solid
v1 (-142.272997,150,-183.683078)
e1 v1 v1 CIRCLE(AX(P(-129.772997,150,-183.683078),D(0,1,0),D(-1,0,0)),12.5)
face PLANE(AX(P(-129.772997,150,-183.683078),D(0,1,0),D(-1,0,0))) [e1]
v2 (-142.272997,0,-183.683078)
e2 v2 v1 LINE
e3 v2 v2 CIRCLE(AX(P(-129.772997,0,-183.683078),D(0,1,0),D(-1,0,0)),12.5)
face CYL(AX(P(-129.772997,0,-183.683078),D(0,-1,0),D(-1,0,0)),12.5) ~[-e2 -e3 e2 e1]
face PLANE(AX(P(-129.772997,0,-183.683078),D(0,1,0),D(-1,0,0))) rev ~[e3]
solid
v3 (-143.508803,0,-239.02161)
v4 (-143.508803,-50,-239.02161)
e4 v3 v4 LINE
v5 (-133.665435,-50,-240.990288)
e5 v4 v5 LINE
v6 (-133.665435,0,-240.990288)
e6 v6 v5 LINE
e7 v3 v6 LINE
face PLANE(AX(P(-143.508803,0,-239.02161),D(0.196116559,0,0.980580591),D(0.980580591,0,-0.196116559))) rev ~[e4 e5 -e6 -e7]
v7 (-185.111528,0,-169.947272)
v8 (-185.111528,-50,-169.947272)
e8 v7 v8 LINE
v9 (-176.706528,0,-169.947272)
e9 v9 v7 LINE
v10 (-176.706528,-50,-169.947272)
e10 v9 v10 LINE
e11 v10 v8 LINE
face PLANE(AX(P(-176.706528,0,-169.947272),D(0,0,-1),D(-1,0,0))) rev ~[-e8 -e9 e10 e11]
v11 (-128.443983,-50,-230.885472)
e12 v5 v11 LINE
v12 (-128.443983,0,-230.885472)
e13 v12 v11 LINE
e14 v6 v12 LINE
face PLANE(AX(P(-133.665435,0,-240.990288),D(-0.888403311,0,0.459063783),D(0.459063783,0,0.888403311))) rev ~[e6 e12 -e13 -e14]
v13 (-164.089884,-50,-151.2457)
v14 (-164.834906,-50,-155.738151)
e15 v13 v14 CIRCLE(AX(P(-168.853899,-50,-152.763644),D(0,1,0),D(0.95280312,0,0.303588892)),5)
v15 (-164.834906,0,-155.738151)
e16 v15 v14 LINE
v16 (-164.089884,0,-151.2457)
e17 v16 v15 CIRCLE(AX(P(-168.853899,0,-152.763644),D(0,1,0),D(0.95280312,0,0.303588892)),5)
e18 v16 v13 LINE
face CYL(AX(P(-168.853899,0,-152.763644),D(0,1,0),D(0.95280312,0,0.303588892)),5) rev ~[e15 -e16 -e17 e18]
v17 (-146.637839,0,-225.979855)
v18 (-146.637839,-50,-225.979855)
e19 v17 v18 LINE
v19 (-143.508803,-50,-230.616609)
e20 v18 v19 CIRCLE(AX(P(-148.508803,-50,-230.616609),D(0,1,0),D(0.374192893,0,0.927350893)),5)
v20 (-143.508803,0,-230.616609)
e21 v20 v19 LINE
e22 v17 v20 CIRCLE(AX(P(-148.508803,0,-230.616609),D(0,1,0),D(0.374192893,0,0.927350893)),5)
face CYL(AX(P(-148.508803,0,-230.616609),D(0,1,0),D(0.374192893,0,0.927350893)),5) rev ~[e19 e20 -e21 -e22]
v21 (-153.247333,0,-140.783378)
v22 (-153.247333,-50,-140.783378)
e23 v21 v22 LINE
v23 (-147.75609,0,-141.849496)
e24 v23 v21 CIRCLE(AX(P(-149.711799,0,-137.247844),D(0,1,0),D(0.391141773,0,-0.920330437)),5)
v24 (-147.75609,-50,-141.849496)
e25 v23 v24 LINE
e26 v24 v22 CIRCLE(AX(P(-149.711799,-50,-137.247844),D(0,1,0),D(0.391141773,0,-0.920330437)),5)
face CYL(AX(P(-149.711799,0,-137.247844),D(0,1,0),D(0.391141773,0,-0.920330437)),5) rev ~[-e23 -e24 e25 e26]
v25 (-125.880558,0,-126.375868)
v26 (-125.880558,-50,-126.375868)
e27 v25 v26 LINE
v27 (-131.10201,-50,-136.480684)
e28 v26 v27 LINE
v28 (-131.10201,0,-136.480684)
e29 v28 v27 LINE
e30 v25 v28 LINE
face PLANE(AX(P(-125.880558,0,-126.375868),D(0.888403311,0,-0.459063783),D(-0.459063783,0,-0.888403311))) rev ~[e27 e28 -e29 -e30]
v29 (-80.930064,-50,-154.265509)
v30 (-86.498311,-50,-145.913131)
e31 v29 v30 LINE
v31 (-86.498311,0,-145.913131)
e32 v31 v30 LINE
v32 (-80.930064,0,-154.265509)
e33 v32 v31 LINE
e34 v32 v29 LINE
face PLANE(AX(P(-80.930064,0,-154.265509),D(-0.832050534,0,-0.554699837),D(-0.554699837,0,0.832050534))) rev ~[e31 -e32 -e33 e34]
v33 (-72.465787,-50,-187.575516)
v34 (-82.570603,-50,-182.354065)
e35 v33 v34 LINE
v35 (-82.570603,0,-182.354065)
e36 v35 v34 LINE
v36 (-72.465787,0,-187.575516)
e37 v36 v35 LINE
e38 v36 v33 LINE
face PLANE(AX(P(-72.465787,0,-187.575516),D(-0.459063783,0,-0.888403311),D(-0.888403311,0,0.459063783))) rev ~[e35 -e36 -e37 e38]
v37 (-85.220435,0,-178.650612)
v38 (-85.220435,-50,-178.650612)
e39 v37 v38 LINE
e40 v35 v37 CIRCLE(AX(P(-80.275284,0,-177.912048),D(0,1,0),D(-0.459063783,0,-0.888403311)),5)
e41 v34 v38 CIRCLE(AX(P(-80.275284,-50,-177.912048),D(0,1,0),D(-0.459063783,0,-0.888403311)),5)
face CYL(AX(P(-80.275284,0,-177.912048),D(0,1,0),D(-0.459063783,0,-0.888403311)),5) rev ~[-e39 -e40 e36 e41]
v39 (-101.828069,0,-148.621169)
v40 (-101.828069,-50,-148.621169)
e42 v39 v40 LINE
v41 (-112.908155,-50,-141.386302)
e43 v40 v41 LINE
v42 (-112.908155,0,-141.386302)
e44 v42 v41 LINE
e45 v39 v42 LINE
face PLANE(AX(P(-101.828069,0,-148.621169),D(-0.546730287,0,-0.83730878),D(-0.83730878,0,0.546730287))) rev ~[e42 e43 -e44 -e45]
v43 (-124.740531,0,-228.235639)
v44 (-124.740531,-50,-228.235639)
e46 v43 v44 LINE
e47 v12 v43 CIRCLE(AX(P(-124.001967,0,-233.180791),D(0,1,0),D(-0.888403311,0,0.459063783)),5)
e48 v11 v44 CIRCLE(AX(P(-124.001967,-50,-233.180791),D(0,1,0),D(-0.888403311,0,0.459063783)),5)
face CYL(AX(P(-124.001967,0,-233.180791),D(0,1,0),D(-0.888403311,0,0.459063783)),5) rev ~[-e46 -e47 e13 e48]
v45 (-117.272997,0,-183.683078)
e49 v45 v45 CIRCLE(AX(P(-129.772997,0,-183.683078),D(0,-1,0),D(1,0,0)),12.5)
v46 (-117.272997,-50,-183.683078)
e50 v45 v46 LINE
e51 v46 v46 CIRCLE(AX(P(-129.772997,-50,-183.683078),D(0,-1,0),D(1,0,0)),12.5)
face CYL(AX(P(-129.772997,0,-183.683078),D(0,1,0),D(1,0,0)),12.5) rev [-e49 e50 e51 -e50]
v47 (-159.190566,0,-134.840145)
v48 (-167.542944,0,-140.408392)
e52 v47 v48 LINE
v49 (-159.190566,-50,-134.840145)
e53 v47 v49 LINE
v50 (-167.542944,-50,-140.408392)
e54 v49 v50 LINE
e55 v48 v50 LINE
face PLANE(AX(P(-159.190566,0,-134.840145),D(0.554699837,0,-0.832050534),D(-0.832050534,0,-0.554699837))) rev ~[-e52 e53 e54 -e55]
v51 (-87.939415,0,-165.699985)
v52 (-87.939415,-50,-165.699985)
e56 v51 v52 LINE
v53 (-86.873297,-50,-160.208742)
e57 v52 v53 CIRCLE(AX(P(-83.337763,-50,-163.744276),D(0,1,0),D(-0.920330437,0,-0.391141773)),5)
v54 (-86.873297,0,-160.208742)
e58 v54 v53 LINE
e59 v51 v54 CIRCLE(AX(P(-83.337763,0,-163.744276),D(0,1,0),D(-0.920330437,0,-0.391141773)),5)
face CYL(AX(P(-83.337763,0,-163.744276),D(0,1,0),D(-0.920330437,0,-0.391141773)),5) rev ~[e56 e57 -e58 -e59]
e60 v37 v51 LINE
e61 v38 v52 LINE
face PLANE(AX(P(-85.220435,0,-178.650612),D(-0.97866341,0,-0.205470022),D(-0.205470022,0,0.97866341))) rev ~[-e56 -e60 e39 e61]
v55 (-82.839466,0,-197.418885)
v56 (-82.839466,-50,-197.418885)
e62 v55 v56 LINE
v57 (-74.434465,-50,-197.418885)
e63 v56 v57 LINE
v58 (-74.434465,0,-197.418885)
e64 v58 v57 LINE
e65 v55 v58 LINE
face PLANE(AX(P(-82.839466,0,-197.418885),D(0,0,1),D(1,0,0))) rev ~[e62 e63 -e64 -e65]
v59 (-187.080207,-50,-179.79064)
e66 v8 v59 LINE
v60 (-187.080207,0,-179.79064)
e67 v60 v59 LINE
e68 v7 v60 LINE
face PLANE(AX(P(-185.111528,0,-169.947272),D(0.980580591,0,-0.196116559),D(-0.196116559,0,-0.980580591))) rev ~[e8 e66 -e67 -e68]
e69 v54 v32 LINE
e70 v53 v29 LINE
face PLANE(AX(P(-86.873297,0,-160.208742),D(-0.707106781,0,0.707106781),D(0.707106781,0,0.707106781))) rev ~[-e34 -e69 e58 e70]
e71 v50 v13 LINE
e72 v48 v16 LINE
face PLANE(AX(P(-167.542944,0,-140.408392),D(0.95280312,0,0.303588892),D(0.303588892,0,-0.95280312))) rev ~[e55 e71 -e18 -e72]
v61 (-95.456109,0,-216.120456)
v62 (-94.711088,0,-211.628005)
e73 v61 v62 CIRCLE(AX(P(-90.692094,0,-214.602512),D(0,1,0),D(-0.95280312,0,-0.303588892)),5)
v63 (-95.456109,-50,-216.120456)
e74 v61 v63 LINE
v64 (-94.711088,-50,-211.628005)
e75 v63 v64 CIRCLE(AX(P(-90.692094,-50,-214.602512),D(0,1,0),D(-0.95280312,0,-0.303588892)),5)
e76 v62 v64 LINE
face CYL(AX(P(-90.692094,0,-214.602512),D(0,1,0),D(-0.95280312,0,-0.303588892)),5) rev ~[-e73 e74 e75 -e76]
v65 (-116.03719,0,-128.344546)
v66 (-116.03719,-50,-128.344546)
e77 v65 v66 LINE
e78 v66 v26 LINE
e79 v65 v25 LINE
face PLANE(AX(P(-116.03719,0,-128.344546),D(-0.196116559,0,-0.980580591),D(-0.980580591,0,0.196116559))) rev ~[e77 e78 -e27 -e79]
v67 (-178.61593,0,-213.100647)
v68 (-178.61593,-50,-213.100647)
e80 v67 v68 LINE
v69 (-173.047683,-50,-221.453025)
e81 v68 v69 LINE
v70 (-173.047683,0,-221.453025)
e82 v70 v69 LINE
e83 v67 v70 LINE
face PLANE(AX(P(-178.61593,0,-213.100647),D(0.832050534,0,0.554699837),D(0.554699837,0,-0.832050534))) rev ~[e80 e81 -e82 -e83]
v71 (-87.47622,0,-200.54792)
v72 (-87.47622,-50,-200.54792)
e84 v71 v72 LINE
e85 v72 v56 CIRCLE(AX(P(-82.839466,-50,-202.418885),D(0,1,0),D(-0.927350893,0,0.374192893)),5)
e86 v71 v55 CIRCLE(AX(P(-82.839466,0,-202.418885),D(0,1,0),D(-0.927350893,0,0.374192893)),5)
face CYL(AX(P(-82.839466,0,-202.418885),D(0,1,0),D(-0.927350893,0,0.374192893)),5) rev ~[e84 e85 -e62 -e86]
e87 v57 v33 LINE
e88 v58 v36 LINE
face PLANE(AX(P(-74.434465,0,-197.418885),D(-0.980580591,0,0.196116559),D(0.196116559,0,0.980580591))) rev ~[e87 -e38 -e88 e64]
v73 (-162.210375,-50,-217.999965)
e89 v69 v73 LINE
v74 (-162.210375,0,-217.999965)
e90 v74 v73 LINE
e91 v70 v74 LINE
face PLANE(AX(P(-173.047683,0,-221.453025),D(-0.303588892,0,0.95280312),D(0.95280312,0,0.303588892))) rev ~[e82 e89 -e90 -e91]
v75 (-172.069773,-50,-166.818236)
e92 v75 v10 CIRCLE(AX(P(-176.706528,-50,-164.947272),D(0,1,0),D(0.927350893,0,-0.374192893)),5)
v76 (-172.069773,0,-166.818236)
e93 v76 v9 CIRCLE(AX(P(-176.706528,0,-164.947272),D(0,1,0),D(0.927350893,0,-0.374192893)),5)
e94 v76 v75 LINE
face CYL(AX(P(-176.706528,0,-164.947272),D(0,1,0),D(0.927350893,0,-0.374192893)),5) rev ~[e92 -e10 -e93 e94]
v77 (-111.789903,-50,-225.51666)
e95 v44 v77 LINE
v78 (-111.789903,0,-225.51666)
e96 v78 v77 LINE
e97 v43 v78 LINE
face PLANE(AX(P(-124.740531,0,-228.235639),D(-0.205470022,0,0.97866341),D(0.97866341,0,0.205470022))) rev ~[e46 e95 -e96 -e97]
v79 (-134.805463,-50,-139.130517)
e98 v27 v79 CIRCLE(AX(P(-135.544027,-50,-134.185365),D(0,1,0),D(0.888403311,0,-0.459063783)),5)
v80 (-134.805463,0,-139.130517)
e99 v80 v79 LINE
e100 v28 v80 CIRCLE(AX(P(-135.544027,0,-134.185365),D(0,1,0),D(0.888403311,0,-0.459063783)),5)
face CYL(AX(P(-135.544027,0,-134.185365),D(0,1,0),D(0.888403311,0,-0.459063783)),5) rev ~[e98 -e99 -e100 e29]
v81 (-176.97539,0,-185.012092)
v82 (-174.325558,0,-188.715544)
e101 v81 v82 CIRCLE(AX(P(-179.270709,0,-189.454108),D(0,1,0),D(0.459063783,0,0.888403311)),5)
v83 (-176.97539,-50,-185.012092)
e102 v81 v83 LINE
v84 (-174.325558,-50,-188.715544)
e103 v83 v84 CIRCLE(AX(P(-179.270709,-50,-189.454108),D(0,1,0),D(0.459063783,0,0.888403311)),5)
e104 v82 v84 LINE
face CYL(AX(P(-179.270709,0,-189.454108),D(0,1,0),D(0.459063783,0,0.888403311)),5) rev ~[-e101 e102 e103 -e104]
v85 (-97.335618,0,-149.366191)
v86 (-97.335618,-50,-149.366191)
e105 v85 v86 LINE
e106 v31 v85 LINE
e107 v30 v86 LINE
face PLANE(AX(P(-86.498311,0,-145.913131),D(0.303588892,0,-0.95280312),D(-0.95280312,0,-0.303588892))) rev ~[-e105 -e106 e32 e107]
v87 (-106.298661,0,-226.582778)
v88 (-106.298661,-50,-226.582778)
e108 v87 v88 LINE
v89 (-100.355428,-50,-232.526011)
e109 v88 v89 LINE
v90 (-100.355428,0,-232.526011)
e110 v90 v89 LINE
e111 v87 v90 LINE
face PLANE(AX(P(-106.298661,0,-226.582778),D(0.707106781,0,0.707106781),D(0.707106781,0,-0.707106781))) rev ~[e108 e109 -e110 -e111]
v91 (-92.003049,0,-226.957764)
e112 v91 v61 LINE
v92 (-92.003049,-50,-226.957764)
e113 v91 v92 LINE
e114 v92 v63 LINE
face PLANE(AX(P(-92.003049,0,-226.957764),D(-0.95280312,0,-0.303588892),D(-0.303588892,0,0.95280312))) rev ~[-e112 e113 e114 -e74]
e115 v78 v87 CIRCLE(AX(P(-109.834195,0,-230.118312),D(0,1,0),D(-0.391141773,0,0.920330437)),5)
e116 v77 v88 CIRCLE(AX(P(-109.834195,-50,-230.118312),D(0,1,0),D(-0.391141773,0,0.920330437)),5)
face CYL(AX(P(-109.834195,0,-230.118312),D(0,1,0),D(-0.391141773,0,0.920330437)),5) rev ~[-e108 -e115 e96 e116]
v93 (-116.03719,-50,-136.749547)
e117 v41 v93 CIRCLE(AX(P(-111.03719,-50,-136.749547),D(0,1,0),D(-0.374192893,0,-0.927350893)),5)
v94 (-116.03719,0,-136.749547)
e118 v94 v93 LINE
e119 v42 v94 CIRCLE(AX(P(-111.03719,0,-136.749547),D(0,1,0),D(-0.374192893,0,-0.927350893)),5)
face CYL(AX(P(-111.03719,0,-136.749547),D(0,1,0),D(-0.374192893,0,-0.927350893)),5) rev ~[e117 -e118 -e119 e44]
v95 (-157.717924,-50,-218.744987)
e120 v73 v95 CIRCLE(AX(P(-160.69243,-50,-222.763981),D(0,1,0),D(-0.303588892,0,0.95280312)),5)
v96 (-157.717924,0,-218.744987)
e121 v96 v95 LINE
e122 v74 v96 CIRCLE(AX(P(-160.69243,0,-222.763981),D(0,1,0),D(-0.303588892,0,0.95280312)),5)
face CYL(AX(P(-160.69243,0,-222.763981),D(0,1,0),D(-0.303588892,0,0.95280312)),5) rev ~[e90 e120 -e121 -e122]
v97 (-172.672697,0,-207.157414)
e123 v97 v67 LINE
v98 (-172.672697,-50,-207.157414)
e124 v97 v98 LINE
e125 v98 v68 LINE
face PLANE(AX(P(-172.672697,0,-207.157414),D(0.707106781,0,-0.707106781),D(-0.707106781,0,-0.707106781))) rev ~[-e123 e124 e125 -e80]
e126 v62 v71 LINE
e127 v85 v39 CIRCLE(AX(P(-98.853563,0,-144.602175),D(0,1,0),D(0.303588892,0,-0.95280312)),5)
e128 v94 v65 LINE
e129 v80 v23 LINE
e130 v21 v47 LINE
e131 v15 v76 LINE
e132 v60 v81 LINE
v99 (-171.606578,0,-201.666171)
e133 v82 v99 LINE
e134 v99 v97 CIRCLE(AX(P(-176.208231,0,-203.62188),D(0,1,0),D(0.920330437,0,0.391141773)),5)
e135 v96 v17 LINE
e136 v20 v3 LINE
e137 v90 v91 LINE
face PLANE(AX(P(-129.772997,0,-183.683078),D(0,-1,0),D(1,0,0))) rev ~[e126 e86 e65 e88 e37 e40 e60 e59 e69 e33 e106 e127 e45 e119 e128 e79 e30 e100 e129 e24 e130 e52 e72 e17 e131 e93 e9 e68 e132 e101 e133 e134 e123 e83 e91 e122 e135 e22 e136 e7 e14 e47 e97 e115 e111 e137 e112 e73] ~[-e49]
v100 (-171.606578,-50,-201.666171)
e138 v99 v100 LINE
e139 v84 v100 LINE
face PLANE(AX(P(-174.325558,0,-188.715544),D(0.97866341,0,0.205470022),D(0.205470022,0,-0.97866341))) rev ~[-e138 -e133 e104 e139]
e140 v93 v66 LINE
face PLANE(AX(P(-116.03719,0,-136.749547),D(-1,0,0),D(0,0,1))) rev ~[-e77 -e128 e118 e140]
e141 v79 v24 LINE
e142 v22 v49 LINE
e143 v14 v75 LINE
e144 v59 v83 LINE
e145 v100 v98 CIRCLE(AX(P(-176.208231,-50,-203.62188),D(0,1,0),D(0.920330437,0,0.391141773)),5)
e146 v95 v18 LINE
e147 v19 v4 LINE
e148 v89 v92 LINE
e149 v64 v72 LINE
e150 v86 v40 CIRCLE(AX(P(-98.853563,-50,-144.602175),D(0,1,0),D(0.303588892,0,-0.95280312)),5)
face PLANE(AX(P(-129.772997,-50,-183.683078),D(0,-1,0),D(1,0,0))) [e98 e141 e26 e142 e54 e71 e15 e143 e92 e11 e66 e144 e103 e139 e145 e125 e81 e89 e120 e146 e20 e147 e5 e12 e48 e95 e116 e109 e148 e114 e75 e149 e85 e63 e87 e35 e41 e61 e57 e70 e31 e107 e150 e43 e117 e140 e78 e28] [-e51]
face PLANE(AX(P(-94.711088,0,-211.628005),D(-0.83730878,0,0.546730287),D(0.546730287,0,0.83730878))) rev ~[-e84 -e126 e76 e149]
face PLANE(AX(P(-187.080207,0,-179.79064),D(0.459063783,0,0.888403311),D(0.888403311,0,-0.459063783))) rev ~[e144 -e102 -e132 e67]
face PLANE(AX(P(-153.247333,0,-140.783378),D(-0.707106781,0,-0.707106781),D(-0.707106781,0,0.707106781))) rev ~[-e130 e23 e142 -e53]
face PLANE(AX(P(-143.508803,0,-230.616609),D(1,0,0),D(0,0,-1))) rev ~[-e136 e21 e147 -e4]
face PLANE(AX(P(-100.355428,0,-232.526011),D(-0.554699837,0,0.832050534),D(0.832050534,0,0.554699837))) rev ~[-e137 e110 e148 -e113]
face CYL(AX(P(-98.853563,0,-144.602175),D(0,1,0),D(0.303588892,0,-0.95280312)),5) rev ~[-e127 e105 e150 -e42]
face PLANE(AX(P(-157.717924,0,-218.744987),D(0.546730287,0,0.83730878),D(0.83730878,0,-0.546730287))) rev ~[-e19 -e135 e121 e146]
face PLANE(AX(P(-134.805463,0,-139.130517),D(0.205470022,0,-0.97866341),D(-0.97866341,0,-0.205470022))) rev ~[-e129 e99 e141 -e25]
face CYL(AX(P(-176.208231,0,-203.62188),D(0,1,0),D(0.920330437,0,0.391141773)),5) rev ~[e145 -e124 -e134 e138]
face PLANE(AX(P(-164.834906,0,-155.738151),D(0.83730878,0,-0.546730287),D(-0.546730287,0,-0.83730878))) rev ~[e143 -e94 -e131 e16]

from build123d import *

# Parameters (mm, degrees)
F0_R     = 12.5
F1_DEPTH = 50
F2_R     = 12.5
F3_DEPTH = 150


with BuildPart() as f1:
    # F0 (on Front) → F1 (new body)
    with BuildSketch(Plane.XZ):
        with BuildLine():
            Line((-116.0371901115, -128.3445464136), (-125.8805584276, -126.3758683266))
            Line((-125.8805584276, -126.3758683266), (-131.1020102552, -136.4806844073))
            ThreePointArc((-131.1020102552, -136.4806844073), (-132.6345582421, -138.2516897117), (-134.8054626168, -139.1305169507))
            Line((-134.8054626168, -139.1305169507), (-147.7560899978, -141.8494963995))
            ThreePointArc((-147.7560899978, -141.8494963995), (-150.6647489323, -142.156192832), (-153.2473327671, -140.7833781193))
            Line((-153.2473327671, -140.7833781193), (-159.1905657596, -134.8401451268))
            Line((-159.1905657596, -134.8401451268), (-167.5429438709, -140.4083919875))
            Line((-167.5429438709, -140.4083919875), (-164.0898838925, -151.2456999557))
            ThreePointArc((-164.0898838925, -151.2456999557), (-163.9212691063, -153.5816648901), (-164.8349056108, -155.738150795))
            Line((-164.8349056108, -155.738150795), (-172.0697732464, -166.8182360428))
            ThreePointArc((-172.0697732464, -166.8182360428), (-173.9096385759, -169.0918356267), (-176.7065277112, -169.9472715767))
            Line((-176.7065277112, -169.9472715767), (-185.1115284135, -169.9472715767))
            Line((-185.1115284135, -169.9472715767), (-187.0802065005, -179.7906398927))
            Line((-187.0802065005, -179.7906398927), (-176.9753904198, -185.0120917203))
            ThreePointArc((-176.9753904198, -185.0120917203), (-175.2043851154, -186.5446397072), (-174.3255578764, -188.715544082))
            Line((-174.3255578764, -188.715544082), (-171.6065784276, -201.6661714629))
            ThreePointArc((-171.6065784276, -201.6661714629), (-171.2998819951, -204.5748303975), (-172.6726967078, -207.1574142323))
            Line((-172.6726967078, -207.1574142323), (-178.6159297003, -213.1006472248))
            Line((-178.6159297003, -213.1006472248), (-173.0476828396, -221.4530253361))
            Line((-173.0476828396, -221.4530253361), (-162.2103748713, -217.9999653577))
            ThreePointArc((-162.2103748713, -217.9999653577), (-159.874409937, -217.8313505714), (-157.7179240321, -218.7449870759))
            Line((-157.7179240321, -218.7449870759), (-146.6378387843, -225.9798547115))
            ThreePointArc((-146.6378387843, -225.9798547115), (-144.3642392004, -227.8197200411), (-143.5088032504, -230.6166091763))
            Line((-143.5088032504, -230.6166091763), (-143.5088032504, -239.0216098787))
            Line((-143.5088032504, -239.0216098787), (-133.6654349344, -240.9902879657))
            Line((-133.6654349344, -240.9902879657), (-128.4439831068, -230.8854718849))
            ThreePointArc((-128.4439831068, -230.8854718849), (-126.9114351199, -229.1144665805), (-124.7405307451, -228.2356393415))
            Line((-124.7405307451, -228.2356393415), (-111.7899033642, -225.5166598928))
            ThreePointArc((-111.7899033642, -225.5166598928), (-108.8812444296, -225.2099634602), (-106.2986605948, -226.5827781729))
            Line((-106.2986605948, -226.5827781729), (-100.3554276023, -232.5260111654))
            Line((-100.3554276023, -232.5260111654), (-92.003049491, -226.9577643047))
            Line((-92.003049491, -226.9577643047), (-95.4561094694, -216.1204563365))
            ThreePointArc((-95.4561094694, -216.1204563365), (-95.6247242557, -213.7844914022), (-94.7110877512, -211.6280054973))
            Line((-94.7110877512, -211.6280054973), (-87.4762201156, -200.5479202495))
            ThreePointArc((-87.4762201156, -200.5479202495), (-85.636354786, -198.2743206655), (-82.8394656508, -197.4188847156))
            Line((-82.8394656508, -197.4188847156), (-74.4344649484, -197.4188847156))
            Line((-74.4344649484, -197.4188847156), (-72.4657868614, -187.5755163995))
            Line((-72.4657868614, -187.5755163995), (-82.5706029422, -182.3540645719))
            ThreePointArc((-82.5706029422, -182.3540645719), (-84.3416082466, -180.821516585), (-85.2204354856, -178.6506122103))
            Line((-85.2204354856, -178.6506122103), (-87.9394149343, -165.6999848293))
            ThreePointArc((-87.9394149343, -165.6999848293), (-88.2461113669, -162.7913258948), (-86.8732966542, -160.20874206))
            Line((-86.8732966542, -160.20874206), (-80.9300636616, -154.2655090675))
            Line((-80.9300636616, -154.2655090675), (-86.4983105224, -145.9131309562))
            Line((-86.4983105224, -145.9131309562), (-97.3356184906, -149.3661909346))
            ThreePointArc((-97.3356184906, -149.3661909346), (-99.6715834249, -149.5348057208), (-101.8280693298, -148.6211692163))
            Line((-101.8280693298, -148.6211692163), (-112.9081545776, -141.3863015807))
            ThreePointArc((-112.9081545776, -141.3863015807), (-115.1817541616, -139.5464362512), (-116.0371901115, -136.7495471159))
            Line((-116.0371901115, -136.7495471159), (-116.0371901115, -128.3445464136))
        make_face()
        with Locations((-129.772996681, -183.6830781461)):
            Circle(F0_R, mode=Mode.SUBTRACT)
    extrude(amount=F1_DEPTH)


with BuildPart() as f3:
    # F2 (on face) → F3 (new body)
    with BuildSketch(Plane(origin=(0, 0, 0), x_dir=(-1, 0, 0), z_dir=(0, 1, 0))):
        with Locations((129.772996681, -183.6830781461)):
            Circle(F2_R)
    extrude(amount=F3_DEPTH)


solid = Compound([f1.part, f3.part])
